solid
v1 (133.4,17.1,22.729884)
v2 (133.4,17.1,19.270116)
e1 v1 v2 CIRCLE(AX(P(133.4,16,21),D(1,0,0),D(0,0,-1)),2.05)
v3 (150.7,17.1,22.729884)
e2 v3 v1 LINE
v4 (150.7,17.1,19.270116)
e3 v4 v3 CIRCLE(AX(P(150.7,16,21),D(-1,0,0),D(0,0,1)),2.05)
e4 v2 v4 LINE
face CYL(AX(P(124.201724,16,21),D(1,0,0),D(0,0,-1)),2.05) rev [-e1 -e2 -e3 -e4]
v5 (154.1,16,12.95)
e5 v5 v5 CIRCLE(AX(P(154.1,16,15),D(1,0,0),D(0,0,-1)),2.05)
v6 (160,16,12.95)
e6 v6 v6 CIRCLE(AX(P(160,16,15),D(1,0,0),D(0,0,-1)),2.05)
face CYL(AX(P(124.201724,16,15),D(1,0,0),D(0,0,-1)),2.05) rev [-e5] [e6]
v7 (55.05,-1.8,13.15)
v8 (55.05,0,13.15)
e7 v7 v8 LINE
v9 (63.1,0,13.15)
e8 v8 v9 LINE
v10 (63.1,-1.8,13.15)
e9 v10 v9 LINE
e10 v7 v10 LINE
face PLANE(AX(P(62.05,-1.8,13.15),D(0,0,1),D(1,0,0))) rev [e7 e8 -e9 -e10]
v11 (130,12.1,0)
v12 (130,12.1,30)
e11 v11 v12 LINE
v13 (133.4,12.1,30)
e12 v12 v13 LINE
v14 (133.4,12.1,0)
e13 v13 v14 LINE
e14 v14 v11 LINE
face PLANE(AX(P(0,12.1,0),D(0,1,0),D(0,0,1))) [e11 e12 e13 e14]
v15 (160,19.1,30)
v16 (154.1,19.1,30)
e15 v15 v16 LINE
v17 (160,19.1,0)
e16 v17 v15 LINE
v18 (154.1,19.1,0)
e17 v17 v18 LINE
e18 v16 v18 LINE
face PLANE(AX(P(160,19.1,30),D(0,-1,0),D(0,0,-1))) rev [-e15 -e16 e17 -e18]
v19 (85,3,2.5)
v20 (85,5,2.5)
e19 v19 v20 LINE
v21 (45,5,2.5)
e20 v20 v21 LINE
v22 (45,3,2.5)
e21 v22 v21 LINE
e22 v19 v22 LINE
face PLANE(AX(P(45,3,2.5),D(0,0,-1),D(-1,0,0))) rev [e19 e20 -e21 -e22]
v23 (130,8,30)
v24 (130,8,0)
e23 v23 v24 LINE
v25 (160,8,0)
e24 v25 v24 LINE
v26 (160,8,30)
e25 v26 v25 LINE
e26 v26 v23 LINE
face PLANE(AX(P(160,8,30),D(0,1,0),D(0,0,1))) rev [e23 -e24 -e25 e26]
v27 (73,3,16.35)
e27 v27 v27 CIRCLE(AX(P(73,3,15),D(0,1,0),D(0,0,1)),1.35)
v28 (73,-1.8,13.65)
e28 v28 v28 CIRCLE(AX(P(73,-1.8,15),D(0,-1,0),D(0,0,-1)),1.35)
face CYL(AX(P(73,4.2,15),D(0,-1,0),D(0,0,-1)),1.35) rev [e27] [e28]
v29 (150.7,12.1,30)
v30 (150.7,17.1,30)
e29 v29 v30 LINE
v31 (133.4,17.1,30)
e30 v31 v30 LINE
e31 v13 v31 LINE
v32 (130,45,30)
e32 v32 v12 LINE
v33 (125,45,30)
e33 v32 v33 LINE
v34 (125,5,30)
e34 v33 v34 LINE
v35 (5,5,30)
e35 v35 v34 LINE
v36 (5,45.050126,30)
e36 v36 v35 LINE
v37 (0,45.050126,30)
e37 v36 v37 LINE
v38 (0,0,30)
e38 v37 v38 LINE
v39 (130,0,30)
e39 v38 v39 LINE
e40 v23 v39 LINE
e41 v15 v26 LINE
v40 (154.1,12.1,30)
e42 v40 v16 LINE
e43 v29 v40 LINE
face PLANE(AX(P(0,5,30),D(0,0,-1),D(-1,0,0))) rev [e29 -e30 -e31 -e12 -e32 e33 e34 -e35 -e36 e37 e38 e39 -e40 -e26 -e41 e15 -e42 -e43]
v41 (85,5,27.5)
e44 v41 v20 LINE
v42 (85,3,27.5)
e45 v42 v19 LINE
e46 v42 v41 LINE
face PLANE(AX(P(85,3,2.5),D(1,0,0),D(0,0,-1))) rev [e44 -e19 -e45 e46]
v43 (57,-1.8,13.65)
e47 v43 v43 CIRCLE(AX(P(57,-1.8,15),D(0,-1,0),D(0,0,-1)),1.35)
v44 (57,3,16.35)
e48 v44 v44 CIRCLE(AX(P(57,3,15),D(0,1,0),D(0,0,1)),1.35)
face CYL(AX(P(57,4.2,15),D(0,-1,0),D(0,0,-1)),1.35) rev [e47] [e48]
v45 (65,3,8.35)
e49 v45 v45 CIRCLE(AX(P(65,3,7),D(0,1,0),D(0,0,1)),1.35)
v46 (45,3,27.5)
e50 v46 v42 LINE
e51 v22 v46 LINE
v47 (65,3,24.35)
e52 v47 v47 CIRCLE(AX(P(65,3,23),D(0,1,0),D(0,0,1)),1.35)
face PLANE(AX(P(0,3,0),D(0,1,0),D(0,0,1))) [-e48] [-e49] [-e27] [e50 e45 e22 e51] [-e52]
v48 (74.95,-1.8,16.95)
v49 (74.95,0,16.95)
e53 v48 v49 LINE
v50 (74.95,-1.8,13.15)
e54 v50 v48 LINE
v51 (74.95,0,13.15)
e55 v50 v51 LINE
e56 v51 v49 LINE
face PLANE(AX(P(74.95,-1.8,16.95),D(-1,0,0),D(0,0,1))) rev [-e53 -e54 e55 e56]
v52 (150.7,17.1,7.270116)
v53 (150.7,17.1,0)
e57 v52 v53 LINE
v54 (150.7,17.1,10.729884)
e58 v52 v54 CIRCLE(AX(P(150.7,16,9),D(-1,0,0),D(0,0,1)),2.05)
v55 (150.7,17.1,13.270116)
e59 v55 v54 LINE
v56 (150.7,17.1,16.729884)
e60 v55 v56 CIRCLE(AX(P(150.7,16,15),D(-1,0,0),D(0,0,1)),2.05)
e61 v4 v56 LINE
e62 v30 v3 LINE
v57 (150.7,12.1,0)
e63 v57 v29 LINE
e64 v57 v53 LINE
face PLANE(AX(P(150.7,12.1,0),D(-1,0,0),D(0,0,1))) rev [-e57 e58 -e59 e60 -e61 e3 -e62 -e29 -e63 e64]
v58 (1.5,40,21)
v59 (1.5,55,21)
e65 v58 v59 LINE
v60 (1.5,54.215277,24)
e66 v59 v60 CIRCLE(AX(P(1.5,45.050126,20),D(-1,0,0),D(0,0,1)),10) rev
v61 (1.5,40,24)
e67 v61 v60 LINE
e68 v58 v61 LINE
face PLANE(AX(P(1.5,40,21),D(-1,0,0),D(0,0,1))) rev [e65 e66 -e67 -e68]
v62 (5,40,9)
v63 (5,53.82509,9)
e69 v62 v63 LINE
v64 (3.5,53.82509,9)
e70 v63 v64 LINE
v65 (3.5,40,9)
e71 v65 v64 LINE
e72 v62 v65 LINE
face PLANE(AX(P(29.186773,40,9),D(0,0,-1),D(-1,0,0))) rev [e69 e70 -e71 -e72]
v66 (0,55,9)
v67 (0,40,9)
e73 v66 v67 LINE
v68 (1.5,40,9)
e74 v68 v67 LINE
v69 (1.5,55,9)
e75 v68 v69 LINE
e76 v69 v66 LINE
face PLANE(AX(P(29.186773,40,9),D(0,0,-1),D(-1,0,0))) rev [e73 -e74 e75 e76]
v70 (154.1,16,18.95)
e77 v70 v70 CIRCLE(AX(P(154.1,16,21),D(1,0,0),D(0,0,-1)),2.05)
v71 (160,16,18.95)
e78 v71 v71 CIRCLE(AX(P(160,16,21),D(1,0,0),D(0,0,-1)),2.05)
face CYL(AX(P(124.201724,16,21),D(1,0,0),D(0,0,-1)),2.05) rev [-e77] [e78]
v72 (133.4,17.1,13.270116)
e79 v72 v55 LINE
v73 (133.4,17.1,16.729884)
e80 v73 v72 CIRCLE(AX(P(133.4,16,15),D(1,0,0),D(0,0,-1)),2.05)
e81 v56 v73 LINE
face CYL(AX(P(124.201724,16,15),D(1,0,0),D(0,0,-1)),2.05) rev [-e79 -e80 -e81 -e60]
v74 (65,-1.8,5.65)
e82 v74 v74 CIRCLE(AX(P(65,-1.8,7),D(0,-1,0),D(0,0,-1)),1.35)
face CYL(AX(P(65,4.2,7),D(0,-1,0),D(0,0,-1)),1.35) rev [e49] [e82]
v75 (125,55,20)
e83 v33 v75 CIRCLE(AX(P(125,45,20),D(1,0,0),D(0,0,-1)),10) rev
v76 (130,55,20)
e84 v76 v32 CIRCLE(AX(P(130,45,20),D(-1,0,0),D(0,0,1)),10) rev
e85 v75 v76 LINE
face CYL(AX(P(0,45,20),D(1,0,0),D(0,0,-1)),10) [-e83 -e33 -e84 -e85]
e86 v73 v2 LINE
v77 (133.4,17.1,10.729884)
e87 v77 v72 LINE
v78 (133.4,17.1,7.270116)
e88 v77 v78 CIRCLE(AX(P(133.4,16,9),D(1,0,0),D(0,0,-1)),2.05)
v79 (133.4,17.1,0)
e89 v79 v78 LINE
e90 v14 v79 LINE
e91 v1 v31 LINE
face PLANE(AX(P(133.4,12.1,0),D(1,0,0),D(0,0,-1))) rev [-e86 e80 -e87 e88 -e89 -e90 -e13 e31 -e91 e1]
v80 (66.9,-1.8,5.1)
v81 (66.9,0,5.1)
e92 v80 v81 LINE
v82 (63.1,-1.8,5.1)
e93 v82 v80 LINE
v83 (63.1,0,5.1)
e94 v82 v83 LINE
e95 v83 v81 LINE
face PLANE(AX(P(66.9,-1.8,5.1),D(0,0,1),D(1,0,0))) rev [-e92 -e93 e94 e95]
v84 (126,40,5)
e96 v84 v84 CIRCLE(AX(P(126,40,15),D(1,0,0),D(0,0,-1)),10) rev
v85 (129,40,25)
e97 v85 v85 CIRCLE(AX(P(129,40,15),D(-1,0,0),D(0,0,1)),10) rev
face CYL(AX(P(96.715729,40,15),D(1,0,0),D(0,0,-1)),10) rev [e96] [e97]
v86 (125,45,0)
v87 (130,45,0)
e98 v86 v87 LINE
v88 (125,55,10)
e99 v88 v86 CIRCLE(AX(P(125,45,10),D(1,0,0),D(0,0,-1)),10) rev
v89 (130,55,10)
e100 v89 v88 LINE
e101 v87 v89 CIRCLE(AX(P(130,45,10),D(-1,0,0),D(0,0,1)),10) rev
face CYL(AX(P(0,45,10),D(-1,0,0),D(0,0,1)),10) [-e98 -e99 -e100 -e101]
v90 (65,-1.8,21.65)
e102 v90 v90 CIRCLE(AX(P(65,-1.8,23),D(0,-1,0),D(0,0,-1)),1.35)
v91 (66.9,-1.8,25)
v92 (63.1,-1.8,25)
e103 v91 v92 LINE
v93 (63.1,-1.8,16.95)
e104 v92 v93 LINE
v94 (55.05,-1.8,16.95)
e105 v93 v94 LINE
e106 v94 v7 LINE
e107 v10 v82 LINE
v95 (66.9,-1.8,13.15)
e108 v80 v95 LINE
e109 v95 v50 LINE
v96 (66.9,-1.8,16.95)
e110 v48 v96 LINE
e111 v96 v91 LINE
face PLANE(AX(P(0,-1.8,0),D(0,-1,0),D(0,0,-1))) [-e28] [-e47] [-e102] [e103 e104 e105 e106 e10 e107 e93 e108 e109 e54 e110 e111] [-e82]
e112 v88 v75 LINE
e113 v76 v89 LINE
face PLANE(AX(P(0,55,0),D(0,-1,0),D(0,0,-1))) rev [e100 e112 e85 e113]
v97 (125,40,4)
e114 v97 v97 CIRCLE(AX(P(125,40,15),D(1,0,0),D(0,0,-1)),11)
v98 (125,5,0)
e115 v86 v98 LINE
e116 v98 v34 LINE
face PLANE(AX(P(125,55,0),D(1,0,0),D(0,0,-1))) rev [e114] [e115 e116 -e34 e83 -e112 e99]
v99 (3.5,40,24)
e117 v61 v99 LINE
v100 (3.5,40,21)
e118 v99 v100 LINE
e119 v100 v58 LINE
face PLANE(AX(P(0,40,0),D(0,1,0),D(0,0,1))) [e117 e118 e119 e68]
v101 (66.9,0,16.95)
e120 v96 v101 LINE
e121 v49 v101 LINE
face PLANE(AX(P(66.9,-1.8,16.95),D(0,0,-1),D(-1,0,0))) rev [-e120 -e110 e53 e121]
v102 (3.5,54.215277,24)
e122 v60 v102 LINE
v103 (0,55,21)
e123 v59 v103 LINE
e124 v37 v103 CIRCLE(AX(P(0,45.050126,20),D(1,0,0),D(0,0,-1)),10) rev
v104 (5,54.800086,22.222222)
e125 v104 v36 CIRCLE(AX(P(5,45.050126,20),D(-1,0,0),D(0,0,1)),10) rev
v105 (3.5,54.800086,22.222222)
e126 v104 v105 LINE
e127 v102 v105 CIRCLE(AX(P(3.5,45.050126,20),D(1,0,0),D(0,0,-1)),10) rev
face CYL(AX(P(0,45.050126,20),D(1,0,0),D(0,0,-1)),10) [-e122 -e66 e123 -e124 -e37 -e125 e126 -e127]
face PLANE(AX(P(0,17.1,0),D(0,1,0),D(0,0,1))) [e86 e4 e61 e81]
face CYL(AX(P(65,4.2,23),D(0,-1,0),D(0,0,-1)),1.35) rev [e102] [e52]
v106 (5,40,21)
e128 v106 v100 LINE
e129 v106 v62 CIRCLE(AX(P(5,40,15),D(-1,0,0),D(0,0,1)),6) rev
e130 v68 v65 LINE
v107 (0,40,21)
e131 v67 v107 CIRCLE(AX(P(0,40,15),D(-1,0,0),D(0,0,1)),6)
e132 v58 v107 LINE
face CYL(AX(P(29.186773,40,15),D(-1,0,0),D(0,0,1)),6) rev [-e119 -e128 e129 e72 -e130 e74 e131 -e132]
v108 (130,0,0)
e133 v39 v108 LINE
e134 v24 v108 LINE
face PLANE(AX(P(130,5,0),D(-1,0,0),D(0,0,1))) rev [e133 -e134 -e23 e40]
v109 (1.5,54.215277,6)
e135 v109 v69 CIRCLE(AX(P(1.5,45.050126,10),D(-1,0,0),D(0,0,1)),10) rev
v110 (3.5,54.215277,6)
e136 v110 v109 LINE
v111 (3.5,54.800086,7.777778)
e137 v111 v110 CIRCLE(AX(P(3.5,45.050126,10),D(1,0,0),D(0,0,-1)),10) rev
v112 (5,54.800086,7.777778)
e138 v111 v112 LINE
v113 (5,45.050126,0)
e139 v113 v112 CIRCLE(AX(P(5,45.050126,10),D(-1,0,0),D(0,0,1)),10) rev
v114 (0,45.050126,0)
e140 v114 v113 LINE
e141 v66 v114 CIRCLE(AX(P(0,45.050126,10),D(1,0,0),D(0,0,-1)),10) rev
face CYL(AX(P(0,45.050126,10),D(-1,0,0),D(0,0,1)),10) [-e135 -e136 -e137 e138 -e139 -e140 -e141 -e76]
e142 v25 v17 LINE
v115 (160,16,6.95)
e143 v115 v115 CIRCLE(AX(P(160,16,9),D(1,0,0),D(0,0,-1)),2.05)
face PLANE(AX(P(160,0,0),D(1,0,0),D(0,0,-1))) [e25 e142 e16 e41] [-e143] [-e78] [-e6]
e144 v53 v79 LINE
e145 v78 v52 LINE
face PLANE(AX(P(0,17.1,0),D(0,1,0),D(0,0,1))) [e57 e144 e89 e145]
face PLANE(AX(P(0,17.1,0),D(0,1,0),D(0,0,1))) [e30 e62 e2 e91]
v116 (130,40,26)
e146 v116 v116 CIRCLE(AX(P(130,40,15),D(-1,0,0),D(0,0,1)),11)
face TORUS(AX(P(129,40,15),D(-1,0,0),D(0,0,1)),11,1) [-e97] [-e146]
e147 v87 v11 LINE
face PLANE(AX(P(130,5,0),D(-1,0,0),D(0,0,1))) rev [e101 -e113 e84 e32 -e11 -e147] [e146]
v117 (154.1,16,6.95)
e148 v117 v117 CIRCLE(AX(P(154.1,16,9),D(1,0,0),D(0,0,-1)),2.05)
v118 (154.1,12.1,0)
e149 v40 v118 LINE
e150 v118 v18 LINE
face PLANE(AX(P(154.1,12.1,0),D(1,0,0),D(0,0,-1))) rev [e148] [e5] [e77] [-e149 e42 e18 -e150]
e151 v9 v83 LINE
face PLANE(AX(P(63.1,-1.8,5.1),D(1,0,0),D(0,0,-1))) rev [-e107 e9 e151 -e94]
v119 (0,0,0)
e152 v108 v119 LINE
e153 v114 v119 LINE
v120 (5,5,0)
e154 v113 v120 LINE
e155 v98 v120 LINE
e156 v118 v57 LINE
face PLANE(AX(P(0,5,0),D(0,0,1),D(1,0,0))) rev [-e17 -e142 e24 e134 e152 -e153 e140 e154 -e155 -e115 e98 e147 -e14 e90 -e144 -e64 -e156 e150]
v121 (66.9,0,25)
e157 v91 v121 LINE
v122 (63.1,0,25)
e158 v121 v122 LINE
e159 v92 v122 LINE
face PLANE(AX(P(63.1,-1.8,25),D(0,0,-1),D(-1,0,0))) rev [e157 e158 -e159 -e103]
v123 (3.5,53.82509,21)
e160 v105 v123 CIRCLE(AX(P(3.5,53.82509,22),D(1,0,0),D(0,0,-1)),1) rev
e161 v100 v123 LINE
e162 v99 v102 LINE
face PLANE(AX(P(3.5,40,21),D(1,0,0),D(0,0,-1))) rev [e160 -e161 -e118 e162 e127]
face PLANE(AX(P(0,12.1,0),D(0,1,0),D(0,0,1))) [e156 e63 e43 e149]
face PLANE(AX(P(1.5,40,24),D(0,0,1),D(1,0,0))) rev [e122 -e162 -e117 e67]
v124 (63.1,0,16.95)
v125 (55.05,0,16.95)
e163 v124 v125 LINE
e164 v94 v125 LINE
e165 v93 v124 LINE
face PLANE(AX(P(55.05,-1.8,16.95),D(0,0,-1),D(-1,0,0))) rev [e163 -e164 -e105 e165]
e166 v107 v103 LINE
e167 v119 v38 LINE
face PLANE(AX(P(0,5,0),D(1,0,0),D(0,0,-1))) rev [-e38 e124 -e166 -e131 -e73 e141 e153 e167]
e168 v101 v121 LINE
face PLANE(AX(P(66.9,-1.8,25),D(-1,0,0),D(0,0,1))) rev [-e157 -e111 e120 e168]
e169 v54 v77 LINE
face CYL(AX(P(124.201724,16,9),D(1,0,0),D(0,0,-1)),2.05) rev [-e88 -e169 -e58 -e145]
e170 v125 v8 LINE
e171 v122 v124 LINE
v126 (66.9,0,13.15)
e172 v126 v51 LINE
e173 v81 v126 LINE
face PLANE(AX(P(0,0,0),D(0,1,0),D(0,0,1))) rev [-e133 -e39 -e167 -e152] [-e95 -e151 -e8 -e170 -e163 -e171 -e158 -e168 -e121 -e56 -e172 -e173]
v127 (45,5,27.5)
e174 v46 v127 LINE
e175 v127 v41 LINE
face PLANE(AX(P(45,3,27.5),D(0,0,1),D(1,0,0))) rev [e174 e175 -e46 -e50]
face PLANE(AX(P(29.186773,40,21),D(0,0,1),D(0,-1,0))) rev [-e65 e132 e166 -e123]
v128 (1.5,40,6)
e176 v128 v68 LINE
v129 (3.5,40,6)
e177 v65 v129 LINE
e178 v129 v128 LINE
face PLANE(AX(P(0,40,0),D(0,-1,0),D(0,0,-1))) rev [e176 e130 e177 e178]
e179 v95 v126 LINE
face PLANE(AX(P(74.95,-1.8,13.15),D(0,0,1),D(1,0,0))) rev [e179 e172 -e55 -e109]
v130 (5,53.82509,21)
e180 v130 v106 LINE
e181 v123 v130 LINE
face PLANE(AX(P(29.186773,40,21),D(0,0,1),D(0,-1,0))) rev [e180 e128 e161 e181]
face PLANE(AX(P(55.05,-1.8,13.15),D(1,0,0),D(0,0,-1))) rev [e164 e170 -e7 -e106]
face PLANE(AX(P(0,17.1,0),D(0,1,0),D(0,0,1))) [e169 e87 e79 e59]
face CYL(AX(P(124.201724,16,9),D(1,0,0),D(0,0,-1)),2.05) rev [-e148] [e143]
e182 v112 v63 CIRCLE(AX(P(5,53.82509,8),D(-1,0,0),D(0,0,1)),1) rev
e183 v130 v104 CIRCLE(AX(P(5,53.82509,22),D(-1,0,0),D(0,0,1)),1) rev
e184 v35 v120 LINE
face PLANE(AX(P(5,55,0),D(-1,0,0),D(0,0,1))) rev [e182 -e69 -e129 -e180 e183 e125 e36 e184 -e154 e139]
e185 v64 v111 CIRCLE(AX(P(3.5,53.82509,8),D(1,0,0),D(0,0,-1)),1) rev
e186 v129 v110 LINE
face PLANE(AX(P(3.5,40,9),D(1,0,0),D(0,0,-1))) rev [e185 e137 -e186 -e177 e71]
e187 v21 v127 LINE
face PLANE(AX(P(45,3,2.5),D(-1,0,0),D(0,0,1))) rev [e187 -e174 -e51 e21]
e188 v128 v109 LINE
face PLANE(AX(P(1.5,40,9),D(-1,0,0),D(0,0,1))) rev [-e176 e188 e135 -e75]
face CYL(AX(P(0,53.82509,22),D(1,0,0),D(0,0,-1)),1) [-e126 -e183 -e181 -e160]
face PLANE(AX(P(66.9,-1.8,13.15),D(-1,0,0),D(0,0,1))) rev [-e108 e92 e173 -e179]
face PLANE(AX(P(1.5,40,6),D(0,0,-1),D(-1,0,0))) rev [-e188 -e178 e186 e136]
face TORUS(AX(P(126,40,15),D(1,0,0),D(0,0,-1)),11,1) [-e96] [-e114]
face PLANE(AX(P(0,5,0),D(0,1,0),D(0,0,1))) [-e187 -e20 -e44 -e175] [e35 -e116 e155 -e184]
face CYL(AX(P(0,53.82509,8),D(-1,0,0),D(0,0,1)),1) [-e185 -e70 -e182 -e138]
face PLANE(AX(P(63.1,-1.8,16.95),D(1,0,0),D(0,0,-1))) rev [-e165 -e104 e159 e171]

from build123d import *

# Parameters (mm, degrees)
SKETCH1_W           = 130
SKETCH1_H           = 30
BOSS_EXTRUDE1_DEPTH = 5
BOSS_EXTRUDE3_DEPTH = 1.8
SKETCH6_W           = 40
SKETCH6_H           = 25
CUT_EXTRUDE2_DEPTH  = 2
SKETCH5_R           = 1.35
CUT_EXTRUDE3_DEPTH  = 6
SKETCH8_W           = 5
SKETCH8_H           = 30
BOSS_EXTRUDE4_DEPTH = 50
SKETCH9_R           = 10
CUT_EXTRUDE4_DEPTH  = 5
SKETCH10_W          = 30
SKETCH10_H          = 11.1
BOSS_EXTRUDE5_DEPTH = 30
SKETCH11_W          = 3.4
SKETCH11_H          = 30
CUT_EXTRUDE5_DEPTH  = 7
CUT_EXTRUDE6_REACH  = 173.828
SKETCH12_R          = 2.05
CUT_EXTRUDE7_DEPTH  = 5
SKETCH14_W          = 17.3
SKETCH14_H          = 30
CUT_EXTRUDE8_DEPTH  = 2
SKETCH15_W          = 2
SKETCH15_H          = 3
CUT_EXTRUDE9_DEPTH  = 15
FILLET1_START       = -1
FILLET1_DEPTH       = 161
FILLET1_START_2     = 5
FILLET1_2_DEPTH     = 155
FILLET3_R           = 1
FILLET6_R           = 1


with BuildPart() as part:
    # Sketch1 → Boss-Extrude1 (new body)
    with BuildSketch(Plane(origin=(0, 0, 0), x_dir=(1, 0, 0), z_dir=(0, 1, 0))):
        with Locations((65, -15)):
            Rectangle(SKETCH1_W, SKETCH1_H)
    extrude(amount=BOSS_EXTRUDE1_DEPTH)

    # Sketch4 → Boss-Extrude3 (add)
    with BuildSketch(Plane.XZ):
        Polygon((63.1, 25), (66.9, 25), (66.9, 17), (66.9, 16.95), (67.95, 16.95), (74.95, 16.95), (74.95, 13.15), (66.95, 13.15), (66.9, 13.15), (66.9, 12.1), (66.9, 5.1), (63.1, 5.1), (63.1, 13.1), (63.1, 13.15), (62.05, 13.15), (55.05, 13.15), (55.05, 16.95), (63.05, 16.95), (63.1, 16.95), (63.1, 18), align=None)
    extrude(amount=BOSS_EXTRUDE3_DEPTH)

    # Sketch6 → Cut-Extrude2 (cut)
    with BuildSketch(Plane(origin=(0, 5, 0), x_dir=(1, 0, 0), z_dir=(0, 1, 0))):
        with Locations((65, -15)):
            Rectangle(SKETCH6_W, SKETCH6_H)
    extrude(amount=-CUT_EXTRUDE2_DEPTH, mode=Mode.SUBTRACT)

    # Sketch5 → Cut-Extrude3 (cut)
    with BuildSketch(Plane.XZ.offset(1.8)):
        with Locations(Location((65, 23, 0), (0, 0, 270))):
            Circle(SKETCH5_R)
        with Locations(Location((73, 15, 0), (0, 0, 270))):
            Circle(SKETCH5_R)
        with Locations(Location((57, 15, 0), (0, 0, 270))):
            Circle(SKETCH5_R)
        with Locations(Location((65, 7, 0), (0, 0, 270))):
            Circle(SKETCH5_R)
    extrude(amount=-CUT_EXTRUDE3_DEPTH, mode=Mode.SUBTRACT)

    # Sketch8 → Boss-Extrude4 (add)
    with BuildSketch(Plane(origin=(0, 5, 0), x_dir=(1, 0, 0), z_dir=(0, 1, 0))):
        with Locations((2.5, -15)):
            Rectangle(SKETCH8_W, SKETCH8_H)
        with Locations((127.5, -15)):
            Rectangle(SKETCH8_W, SKETCH8_H)
    extrude(amount=BOSS_EXTRUDE4_DEPTH)

    # Sketch9 → Cut-Extrude4 (cut)
    with BuildSketch(Plane(origin=(130, 0, 0), x_dir=(0, 0, -1), z_dir=(1, 0, 0))):
        with Locations((-15, 40)):
            Circle(SKETCH9_R)
    extrude(amount=-CUT_EXTRUDE4_DEPTH, mode=Mode.SUBTRACT)

    # Sketch10 → Boss-Extrude5 (add)
    with BuildSketch(Plane(origin=(130, 0, 0), x_dir=(0, 0, -1), z_dir=(1, 0, 0))):
        with Locations((-15, 13.55)):
            Rectangle(SKETCH10_W, SKETCH10_H)
    extrude(amount=BOSS_EXTRUDE5_DEPTH)

    # Sketch11 → Cut-Extrude5 (cut)
    with BuildSketch(Plane(origin=(0, 19.1, 0), x_dir=(1, 0, 0), z_dir=(0, 1, 0))):
        with Locations((131.7, -15)):
            Rectangle(SKETCH11_W, SKETCH11_H)
        with Locations((152.4, -15)):
            Rectangle(SKETCH11_W, SKETCH11_H)
    extrude(amount=-CUT_EXTRUDE5_DEPTH, mode=Mode.SUBTRACT)

    # Cut-Extrude6: up to this face of the body (flat: up to its plane)
    cut_extrude6_end = Plane(part.part.faces().sort_by_distance((130, 12.623489255, 15))[0])
    # Sketch12 → Cut-Extrude6 (cut, up to the picked face)
    with BuildSketch(Plane(origin=(160, 0, 0), x_dir=(0, 0, -1), z_dir=(1, 0, 0)), mode=Mode.PRIVATE) as cut_extrude6_sk1:
        with Locations((-15, 16)):
            Circle(SKETCH12_R)
    cut_extrude6_tool1 = split(extrude(cut_extrude6_sk1.sketch, amount=-CUT_EXTRUDE6_REACH, mode=Mode.PRIVATE), bisect_by=cut_extrude6_end, keep=Keep.BOTH, mode=Mode.PRIVATE)
    # Sketch12 → Cut-Extrude6 (cut, up to the picked face)
    with BuildSketch(Plane(origin=(160, 0, 0), x_dir=(0, 0, -1), z_dir=(1, 0, 0)), mode=Mode.PRIVATE) as cut_extrude6_sk2:
        with Locations((-21, 16)):
            Circle(SKETCH12_R)
    cut_extrude6_tool2 = split(extrude(cut_extrude6_sk2.sketch, amount=-CUT_EXTRUDE6_REACH, mode=Mode.PRIVATE), bisect_by=cut_extrude6_end, keep=Keep.BOTH, mode=Mode.PRIVATE)
    # Sketch12 → Cut-Extrude6 (cut, up to the picked face)
    with BuildSketch(Plane(origin=(160, 0, 0), x_dir=(0, 0, -1), z_dir=(1, 0, 0)), mode=Mode.PRIVATE) as cut_extrude6_sk3:
        with Locations((-9, 16)):
            Circle(SKETCH12_R)
    cut_extrude6_tool3 = split(extrude(cut_extrude6_sk3.sketch, amount=-CUT_EXTRUDE6_REACH, mode=Mode.PRIVATE), bisect_by=cut_extrude6_end, keep=Keep.BOTH, mode=Mode.PRIVATE)
    add(cut_extrude6_tool1.solids().sort_by(Axis((160, 16, 15), (-1, 0, 0)))[0], mode=Mode.SUBTRACT)
    add(cut_extrude6_tool2.solids().sort_by(Axis((160, 16, 21), (-1, 0, 0)))[0], mode=Mode.SUBTRACT)
    add(cut_extrude6_tool3.solids().sort_by(Axis((160, 16, 9), (-1, 0, 0)))[0], mode=Mode.SUBTRACT)

    # Sketch13 → Cut-Extrude7 (cut)
    with BuildSketch(Plane.ZY):
        with BuildLine():
            Line((9, 40), (9, 55))
            Line((9, 55), (21, 55))
            Line((21, 55), (21, 40))
            ThreePointArc((21, 40), (15, 34), (9, 40))
        make_face()
    extrude(amount=-CUT_EXTRUDE7_DEPTH, mode=Mode.SUBTRACT)

    # Sketch14 → Cut-Extrude8 (cut)
    with BuildSketch(Plane(origin=(0, 19.1, 0), x_dir=(1, 0, 0), z_dir=(0, 1, 0))):
        with Locations((142.05, -15)):
            Rectangle(SKETCH14_W, SKETCH14_H)
    extrude(amount=-CUT_EXTRUDE8_DEPTH, mode=Mode.SUBTRACT)

    # Sketch15 → Cut-Extrude9 (cut)
    with BuildSketch(Plane(origin=(0, 55, 0), x_dir=(1, 0, 0), z_dir=(0, 1, 0))):
        with Locations((2.5, -7.5)):
            Rectangle(SKETCH15_W, SKETCH15_H)
        with Locations((2.5, -22.5)):
            Rectangle(SKETCH15_W, SKETCH15_H)
    extrude(amount=-CUT_EXTRUDE9_DEPTH, mode=Mode.SUBTRACT)

    # Fillet1: read off the stored shape, not the designer's step
    # Fillet1 outline → Fillet1 (cut)
    with BuildSketch(Plane.YZ.offset(FILLET1_START)):
        with BuildLine():
            Line((55, 0), (55, 9))
            ThreePointArc((55, 9), (51.758329561, 2.583801513), (45.050125629, 0))
            Line((45.050125629, 0), (55, 0))
        make_face()
        with BuildLine():
            ThreePointArc((45.050125629, 30), (51.758329561, 27.416198487), (55, 21))
            Line((55, 21), (55, 30))
            Line((55, 30), (45.050125629, 30))
        make_face()
    extrude(amount=FILLET1_DEPTH, mode=Mode.SUBTRACT)

    # Fillet1 2 outline → Fillet1 2 (cut)
    with BuildSketch(Plane.YZ.offset(FILLET1_START_2)):
        with BuildLine():
            ThreePointArc((45, 30), (52.071067812, 27.071067812), (55, 20))
            Line((55, 20), (55, 21))
            ThreePointArc((55, 21), (51.758329561, 27.416198487), (45.050125629, 30))
            Line((45.050125629, 30), (45, 30))
        make_face()
        with BuildLine():
            ThreePointArc((45.050125629, 0), (51.758329561, 2.583801513), (55, 9))
            Line((55, 9), (55, 10))
            ThreePointArc((55, 10), (52.071067812, 2.928932188), (45, 0))
            Line((45, 0), (45.050125629, 0))
        make_face()
    extrude(amount=FILLET1_2_DEPTH, mode=Mode.SUBTRACT)

    # Fillet3
    fillet3_edges = [part.edges().sort_by_distance(p)[0] for p in [
        (4.25, 55, 9),
        (4.25, 55, 21),
    ]]
    fillet(fillet3_edges, radius=FILLET3_R)

    # Fillet6
    fillet6_edges = [part.edges().sort_by_distance(p)[0] for p in [
        (130, 40, 25),
        (125, 40, 25),
    ]]
    fillet(fillet6_edges, radius=FILLET6_R)


solid = part.part
